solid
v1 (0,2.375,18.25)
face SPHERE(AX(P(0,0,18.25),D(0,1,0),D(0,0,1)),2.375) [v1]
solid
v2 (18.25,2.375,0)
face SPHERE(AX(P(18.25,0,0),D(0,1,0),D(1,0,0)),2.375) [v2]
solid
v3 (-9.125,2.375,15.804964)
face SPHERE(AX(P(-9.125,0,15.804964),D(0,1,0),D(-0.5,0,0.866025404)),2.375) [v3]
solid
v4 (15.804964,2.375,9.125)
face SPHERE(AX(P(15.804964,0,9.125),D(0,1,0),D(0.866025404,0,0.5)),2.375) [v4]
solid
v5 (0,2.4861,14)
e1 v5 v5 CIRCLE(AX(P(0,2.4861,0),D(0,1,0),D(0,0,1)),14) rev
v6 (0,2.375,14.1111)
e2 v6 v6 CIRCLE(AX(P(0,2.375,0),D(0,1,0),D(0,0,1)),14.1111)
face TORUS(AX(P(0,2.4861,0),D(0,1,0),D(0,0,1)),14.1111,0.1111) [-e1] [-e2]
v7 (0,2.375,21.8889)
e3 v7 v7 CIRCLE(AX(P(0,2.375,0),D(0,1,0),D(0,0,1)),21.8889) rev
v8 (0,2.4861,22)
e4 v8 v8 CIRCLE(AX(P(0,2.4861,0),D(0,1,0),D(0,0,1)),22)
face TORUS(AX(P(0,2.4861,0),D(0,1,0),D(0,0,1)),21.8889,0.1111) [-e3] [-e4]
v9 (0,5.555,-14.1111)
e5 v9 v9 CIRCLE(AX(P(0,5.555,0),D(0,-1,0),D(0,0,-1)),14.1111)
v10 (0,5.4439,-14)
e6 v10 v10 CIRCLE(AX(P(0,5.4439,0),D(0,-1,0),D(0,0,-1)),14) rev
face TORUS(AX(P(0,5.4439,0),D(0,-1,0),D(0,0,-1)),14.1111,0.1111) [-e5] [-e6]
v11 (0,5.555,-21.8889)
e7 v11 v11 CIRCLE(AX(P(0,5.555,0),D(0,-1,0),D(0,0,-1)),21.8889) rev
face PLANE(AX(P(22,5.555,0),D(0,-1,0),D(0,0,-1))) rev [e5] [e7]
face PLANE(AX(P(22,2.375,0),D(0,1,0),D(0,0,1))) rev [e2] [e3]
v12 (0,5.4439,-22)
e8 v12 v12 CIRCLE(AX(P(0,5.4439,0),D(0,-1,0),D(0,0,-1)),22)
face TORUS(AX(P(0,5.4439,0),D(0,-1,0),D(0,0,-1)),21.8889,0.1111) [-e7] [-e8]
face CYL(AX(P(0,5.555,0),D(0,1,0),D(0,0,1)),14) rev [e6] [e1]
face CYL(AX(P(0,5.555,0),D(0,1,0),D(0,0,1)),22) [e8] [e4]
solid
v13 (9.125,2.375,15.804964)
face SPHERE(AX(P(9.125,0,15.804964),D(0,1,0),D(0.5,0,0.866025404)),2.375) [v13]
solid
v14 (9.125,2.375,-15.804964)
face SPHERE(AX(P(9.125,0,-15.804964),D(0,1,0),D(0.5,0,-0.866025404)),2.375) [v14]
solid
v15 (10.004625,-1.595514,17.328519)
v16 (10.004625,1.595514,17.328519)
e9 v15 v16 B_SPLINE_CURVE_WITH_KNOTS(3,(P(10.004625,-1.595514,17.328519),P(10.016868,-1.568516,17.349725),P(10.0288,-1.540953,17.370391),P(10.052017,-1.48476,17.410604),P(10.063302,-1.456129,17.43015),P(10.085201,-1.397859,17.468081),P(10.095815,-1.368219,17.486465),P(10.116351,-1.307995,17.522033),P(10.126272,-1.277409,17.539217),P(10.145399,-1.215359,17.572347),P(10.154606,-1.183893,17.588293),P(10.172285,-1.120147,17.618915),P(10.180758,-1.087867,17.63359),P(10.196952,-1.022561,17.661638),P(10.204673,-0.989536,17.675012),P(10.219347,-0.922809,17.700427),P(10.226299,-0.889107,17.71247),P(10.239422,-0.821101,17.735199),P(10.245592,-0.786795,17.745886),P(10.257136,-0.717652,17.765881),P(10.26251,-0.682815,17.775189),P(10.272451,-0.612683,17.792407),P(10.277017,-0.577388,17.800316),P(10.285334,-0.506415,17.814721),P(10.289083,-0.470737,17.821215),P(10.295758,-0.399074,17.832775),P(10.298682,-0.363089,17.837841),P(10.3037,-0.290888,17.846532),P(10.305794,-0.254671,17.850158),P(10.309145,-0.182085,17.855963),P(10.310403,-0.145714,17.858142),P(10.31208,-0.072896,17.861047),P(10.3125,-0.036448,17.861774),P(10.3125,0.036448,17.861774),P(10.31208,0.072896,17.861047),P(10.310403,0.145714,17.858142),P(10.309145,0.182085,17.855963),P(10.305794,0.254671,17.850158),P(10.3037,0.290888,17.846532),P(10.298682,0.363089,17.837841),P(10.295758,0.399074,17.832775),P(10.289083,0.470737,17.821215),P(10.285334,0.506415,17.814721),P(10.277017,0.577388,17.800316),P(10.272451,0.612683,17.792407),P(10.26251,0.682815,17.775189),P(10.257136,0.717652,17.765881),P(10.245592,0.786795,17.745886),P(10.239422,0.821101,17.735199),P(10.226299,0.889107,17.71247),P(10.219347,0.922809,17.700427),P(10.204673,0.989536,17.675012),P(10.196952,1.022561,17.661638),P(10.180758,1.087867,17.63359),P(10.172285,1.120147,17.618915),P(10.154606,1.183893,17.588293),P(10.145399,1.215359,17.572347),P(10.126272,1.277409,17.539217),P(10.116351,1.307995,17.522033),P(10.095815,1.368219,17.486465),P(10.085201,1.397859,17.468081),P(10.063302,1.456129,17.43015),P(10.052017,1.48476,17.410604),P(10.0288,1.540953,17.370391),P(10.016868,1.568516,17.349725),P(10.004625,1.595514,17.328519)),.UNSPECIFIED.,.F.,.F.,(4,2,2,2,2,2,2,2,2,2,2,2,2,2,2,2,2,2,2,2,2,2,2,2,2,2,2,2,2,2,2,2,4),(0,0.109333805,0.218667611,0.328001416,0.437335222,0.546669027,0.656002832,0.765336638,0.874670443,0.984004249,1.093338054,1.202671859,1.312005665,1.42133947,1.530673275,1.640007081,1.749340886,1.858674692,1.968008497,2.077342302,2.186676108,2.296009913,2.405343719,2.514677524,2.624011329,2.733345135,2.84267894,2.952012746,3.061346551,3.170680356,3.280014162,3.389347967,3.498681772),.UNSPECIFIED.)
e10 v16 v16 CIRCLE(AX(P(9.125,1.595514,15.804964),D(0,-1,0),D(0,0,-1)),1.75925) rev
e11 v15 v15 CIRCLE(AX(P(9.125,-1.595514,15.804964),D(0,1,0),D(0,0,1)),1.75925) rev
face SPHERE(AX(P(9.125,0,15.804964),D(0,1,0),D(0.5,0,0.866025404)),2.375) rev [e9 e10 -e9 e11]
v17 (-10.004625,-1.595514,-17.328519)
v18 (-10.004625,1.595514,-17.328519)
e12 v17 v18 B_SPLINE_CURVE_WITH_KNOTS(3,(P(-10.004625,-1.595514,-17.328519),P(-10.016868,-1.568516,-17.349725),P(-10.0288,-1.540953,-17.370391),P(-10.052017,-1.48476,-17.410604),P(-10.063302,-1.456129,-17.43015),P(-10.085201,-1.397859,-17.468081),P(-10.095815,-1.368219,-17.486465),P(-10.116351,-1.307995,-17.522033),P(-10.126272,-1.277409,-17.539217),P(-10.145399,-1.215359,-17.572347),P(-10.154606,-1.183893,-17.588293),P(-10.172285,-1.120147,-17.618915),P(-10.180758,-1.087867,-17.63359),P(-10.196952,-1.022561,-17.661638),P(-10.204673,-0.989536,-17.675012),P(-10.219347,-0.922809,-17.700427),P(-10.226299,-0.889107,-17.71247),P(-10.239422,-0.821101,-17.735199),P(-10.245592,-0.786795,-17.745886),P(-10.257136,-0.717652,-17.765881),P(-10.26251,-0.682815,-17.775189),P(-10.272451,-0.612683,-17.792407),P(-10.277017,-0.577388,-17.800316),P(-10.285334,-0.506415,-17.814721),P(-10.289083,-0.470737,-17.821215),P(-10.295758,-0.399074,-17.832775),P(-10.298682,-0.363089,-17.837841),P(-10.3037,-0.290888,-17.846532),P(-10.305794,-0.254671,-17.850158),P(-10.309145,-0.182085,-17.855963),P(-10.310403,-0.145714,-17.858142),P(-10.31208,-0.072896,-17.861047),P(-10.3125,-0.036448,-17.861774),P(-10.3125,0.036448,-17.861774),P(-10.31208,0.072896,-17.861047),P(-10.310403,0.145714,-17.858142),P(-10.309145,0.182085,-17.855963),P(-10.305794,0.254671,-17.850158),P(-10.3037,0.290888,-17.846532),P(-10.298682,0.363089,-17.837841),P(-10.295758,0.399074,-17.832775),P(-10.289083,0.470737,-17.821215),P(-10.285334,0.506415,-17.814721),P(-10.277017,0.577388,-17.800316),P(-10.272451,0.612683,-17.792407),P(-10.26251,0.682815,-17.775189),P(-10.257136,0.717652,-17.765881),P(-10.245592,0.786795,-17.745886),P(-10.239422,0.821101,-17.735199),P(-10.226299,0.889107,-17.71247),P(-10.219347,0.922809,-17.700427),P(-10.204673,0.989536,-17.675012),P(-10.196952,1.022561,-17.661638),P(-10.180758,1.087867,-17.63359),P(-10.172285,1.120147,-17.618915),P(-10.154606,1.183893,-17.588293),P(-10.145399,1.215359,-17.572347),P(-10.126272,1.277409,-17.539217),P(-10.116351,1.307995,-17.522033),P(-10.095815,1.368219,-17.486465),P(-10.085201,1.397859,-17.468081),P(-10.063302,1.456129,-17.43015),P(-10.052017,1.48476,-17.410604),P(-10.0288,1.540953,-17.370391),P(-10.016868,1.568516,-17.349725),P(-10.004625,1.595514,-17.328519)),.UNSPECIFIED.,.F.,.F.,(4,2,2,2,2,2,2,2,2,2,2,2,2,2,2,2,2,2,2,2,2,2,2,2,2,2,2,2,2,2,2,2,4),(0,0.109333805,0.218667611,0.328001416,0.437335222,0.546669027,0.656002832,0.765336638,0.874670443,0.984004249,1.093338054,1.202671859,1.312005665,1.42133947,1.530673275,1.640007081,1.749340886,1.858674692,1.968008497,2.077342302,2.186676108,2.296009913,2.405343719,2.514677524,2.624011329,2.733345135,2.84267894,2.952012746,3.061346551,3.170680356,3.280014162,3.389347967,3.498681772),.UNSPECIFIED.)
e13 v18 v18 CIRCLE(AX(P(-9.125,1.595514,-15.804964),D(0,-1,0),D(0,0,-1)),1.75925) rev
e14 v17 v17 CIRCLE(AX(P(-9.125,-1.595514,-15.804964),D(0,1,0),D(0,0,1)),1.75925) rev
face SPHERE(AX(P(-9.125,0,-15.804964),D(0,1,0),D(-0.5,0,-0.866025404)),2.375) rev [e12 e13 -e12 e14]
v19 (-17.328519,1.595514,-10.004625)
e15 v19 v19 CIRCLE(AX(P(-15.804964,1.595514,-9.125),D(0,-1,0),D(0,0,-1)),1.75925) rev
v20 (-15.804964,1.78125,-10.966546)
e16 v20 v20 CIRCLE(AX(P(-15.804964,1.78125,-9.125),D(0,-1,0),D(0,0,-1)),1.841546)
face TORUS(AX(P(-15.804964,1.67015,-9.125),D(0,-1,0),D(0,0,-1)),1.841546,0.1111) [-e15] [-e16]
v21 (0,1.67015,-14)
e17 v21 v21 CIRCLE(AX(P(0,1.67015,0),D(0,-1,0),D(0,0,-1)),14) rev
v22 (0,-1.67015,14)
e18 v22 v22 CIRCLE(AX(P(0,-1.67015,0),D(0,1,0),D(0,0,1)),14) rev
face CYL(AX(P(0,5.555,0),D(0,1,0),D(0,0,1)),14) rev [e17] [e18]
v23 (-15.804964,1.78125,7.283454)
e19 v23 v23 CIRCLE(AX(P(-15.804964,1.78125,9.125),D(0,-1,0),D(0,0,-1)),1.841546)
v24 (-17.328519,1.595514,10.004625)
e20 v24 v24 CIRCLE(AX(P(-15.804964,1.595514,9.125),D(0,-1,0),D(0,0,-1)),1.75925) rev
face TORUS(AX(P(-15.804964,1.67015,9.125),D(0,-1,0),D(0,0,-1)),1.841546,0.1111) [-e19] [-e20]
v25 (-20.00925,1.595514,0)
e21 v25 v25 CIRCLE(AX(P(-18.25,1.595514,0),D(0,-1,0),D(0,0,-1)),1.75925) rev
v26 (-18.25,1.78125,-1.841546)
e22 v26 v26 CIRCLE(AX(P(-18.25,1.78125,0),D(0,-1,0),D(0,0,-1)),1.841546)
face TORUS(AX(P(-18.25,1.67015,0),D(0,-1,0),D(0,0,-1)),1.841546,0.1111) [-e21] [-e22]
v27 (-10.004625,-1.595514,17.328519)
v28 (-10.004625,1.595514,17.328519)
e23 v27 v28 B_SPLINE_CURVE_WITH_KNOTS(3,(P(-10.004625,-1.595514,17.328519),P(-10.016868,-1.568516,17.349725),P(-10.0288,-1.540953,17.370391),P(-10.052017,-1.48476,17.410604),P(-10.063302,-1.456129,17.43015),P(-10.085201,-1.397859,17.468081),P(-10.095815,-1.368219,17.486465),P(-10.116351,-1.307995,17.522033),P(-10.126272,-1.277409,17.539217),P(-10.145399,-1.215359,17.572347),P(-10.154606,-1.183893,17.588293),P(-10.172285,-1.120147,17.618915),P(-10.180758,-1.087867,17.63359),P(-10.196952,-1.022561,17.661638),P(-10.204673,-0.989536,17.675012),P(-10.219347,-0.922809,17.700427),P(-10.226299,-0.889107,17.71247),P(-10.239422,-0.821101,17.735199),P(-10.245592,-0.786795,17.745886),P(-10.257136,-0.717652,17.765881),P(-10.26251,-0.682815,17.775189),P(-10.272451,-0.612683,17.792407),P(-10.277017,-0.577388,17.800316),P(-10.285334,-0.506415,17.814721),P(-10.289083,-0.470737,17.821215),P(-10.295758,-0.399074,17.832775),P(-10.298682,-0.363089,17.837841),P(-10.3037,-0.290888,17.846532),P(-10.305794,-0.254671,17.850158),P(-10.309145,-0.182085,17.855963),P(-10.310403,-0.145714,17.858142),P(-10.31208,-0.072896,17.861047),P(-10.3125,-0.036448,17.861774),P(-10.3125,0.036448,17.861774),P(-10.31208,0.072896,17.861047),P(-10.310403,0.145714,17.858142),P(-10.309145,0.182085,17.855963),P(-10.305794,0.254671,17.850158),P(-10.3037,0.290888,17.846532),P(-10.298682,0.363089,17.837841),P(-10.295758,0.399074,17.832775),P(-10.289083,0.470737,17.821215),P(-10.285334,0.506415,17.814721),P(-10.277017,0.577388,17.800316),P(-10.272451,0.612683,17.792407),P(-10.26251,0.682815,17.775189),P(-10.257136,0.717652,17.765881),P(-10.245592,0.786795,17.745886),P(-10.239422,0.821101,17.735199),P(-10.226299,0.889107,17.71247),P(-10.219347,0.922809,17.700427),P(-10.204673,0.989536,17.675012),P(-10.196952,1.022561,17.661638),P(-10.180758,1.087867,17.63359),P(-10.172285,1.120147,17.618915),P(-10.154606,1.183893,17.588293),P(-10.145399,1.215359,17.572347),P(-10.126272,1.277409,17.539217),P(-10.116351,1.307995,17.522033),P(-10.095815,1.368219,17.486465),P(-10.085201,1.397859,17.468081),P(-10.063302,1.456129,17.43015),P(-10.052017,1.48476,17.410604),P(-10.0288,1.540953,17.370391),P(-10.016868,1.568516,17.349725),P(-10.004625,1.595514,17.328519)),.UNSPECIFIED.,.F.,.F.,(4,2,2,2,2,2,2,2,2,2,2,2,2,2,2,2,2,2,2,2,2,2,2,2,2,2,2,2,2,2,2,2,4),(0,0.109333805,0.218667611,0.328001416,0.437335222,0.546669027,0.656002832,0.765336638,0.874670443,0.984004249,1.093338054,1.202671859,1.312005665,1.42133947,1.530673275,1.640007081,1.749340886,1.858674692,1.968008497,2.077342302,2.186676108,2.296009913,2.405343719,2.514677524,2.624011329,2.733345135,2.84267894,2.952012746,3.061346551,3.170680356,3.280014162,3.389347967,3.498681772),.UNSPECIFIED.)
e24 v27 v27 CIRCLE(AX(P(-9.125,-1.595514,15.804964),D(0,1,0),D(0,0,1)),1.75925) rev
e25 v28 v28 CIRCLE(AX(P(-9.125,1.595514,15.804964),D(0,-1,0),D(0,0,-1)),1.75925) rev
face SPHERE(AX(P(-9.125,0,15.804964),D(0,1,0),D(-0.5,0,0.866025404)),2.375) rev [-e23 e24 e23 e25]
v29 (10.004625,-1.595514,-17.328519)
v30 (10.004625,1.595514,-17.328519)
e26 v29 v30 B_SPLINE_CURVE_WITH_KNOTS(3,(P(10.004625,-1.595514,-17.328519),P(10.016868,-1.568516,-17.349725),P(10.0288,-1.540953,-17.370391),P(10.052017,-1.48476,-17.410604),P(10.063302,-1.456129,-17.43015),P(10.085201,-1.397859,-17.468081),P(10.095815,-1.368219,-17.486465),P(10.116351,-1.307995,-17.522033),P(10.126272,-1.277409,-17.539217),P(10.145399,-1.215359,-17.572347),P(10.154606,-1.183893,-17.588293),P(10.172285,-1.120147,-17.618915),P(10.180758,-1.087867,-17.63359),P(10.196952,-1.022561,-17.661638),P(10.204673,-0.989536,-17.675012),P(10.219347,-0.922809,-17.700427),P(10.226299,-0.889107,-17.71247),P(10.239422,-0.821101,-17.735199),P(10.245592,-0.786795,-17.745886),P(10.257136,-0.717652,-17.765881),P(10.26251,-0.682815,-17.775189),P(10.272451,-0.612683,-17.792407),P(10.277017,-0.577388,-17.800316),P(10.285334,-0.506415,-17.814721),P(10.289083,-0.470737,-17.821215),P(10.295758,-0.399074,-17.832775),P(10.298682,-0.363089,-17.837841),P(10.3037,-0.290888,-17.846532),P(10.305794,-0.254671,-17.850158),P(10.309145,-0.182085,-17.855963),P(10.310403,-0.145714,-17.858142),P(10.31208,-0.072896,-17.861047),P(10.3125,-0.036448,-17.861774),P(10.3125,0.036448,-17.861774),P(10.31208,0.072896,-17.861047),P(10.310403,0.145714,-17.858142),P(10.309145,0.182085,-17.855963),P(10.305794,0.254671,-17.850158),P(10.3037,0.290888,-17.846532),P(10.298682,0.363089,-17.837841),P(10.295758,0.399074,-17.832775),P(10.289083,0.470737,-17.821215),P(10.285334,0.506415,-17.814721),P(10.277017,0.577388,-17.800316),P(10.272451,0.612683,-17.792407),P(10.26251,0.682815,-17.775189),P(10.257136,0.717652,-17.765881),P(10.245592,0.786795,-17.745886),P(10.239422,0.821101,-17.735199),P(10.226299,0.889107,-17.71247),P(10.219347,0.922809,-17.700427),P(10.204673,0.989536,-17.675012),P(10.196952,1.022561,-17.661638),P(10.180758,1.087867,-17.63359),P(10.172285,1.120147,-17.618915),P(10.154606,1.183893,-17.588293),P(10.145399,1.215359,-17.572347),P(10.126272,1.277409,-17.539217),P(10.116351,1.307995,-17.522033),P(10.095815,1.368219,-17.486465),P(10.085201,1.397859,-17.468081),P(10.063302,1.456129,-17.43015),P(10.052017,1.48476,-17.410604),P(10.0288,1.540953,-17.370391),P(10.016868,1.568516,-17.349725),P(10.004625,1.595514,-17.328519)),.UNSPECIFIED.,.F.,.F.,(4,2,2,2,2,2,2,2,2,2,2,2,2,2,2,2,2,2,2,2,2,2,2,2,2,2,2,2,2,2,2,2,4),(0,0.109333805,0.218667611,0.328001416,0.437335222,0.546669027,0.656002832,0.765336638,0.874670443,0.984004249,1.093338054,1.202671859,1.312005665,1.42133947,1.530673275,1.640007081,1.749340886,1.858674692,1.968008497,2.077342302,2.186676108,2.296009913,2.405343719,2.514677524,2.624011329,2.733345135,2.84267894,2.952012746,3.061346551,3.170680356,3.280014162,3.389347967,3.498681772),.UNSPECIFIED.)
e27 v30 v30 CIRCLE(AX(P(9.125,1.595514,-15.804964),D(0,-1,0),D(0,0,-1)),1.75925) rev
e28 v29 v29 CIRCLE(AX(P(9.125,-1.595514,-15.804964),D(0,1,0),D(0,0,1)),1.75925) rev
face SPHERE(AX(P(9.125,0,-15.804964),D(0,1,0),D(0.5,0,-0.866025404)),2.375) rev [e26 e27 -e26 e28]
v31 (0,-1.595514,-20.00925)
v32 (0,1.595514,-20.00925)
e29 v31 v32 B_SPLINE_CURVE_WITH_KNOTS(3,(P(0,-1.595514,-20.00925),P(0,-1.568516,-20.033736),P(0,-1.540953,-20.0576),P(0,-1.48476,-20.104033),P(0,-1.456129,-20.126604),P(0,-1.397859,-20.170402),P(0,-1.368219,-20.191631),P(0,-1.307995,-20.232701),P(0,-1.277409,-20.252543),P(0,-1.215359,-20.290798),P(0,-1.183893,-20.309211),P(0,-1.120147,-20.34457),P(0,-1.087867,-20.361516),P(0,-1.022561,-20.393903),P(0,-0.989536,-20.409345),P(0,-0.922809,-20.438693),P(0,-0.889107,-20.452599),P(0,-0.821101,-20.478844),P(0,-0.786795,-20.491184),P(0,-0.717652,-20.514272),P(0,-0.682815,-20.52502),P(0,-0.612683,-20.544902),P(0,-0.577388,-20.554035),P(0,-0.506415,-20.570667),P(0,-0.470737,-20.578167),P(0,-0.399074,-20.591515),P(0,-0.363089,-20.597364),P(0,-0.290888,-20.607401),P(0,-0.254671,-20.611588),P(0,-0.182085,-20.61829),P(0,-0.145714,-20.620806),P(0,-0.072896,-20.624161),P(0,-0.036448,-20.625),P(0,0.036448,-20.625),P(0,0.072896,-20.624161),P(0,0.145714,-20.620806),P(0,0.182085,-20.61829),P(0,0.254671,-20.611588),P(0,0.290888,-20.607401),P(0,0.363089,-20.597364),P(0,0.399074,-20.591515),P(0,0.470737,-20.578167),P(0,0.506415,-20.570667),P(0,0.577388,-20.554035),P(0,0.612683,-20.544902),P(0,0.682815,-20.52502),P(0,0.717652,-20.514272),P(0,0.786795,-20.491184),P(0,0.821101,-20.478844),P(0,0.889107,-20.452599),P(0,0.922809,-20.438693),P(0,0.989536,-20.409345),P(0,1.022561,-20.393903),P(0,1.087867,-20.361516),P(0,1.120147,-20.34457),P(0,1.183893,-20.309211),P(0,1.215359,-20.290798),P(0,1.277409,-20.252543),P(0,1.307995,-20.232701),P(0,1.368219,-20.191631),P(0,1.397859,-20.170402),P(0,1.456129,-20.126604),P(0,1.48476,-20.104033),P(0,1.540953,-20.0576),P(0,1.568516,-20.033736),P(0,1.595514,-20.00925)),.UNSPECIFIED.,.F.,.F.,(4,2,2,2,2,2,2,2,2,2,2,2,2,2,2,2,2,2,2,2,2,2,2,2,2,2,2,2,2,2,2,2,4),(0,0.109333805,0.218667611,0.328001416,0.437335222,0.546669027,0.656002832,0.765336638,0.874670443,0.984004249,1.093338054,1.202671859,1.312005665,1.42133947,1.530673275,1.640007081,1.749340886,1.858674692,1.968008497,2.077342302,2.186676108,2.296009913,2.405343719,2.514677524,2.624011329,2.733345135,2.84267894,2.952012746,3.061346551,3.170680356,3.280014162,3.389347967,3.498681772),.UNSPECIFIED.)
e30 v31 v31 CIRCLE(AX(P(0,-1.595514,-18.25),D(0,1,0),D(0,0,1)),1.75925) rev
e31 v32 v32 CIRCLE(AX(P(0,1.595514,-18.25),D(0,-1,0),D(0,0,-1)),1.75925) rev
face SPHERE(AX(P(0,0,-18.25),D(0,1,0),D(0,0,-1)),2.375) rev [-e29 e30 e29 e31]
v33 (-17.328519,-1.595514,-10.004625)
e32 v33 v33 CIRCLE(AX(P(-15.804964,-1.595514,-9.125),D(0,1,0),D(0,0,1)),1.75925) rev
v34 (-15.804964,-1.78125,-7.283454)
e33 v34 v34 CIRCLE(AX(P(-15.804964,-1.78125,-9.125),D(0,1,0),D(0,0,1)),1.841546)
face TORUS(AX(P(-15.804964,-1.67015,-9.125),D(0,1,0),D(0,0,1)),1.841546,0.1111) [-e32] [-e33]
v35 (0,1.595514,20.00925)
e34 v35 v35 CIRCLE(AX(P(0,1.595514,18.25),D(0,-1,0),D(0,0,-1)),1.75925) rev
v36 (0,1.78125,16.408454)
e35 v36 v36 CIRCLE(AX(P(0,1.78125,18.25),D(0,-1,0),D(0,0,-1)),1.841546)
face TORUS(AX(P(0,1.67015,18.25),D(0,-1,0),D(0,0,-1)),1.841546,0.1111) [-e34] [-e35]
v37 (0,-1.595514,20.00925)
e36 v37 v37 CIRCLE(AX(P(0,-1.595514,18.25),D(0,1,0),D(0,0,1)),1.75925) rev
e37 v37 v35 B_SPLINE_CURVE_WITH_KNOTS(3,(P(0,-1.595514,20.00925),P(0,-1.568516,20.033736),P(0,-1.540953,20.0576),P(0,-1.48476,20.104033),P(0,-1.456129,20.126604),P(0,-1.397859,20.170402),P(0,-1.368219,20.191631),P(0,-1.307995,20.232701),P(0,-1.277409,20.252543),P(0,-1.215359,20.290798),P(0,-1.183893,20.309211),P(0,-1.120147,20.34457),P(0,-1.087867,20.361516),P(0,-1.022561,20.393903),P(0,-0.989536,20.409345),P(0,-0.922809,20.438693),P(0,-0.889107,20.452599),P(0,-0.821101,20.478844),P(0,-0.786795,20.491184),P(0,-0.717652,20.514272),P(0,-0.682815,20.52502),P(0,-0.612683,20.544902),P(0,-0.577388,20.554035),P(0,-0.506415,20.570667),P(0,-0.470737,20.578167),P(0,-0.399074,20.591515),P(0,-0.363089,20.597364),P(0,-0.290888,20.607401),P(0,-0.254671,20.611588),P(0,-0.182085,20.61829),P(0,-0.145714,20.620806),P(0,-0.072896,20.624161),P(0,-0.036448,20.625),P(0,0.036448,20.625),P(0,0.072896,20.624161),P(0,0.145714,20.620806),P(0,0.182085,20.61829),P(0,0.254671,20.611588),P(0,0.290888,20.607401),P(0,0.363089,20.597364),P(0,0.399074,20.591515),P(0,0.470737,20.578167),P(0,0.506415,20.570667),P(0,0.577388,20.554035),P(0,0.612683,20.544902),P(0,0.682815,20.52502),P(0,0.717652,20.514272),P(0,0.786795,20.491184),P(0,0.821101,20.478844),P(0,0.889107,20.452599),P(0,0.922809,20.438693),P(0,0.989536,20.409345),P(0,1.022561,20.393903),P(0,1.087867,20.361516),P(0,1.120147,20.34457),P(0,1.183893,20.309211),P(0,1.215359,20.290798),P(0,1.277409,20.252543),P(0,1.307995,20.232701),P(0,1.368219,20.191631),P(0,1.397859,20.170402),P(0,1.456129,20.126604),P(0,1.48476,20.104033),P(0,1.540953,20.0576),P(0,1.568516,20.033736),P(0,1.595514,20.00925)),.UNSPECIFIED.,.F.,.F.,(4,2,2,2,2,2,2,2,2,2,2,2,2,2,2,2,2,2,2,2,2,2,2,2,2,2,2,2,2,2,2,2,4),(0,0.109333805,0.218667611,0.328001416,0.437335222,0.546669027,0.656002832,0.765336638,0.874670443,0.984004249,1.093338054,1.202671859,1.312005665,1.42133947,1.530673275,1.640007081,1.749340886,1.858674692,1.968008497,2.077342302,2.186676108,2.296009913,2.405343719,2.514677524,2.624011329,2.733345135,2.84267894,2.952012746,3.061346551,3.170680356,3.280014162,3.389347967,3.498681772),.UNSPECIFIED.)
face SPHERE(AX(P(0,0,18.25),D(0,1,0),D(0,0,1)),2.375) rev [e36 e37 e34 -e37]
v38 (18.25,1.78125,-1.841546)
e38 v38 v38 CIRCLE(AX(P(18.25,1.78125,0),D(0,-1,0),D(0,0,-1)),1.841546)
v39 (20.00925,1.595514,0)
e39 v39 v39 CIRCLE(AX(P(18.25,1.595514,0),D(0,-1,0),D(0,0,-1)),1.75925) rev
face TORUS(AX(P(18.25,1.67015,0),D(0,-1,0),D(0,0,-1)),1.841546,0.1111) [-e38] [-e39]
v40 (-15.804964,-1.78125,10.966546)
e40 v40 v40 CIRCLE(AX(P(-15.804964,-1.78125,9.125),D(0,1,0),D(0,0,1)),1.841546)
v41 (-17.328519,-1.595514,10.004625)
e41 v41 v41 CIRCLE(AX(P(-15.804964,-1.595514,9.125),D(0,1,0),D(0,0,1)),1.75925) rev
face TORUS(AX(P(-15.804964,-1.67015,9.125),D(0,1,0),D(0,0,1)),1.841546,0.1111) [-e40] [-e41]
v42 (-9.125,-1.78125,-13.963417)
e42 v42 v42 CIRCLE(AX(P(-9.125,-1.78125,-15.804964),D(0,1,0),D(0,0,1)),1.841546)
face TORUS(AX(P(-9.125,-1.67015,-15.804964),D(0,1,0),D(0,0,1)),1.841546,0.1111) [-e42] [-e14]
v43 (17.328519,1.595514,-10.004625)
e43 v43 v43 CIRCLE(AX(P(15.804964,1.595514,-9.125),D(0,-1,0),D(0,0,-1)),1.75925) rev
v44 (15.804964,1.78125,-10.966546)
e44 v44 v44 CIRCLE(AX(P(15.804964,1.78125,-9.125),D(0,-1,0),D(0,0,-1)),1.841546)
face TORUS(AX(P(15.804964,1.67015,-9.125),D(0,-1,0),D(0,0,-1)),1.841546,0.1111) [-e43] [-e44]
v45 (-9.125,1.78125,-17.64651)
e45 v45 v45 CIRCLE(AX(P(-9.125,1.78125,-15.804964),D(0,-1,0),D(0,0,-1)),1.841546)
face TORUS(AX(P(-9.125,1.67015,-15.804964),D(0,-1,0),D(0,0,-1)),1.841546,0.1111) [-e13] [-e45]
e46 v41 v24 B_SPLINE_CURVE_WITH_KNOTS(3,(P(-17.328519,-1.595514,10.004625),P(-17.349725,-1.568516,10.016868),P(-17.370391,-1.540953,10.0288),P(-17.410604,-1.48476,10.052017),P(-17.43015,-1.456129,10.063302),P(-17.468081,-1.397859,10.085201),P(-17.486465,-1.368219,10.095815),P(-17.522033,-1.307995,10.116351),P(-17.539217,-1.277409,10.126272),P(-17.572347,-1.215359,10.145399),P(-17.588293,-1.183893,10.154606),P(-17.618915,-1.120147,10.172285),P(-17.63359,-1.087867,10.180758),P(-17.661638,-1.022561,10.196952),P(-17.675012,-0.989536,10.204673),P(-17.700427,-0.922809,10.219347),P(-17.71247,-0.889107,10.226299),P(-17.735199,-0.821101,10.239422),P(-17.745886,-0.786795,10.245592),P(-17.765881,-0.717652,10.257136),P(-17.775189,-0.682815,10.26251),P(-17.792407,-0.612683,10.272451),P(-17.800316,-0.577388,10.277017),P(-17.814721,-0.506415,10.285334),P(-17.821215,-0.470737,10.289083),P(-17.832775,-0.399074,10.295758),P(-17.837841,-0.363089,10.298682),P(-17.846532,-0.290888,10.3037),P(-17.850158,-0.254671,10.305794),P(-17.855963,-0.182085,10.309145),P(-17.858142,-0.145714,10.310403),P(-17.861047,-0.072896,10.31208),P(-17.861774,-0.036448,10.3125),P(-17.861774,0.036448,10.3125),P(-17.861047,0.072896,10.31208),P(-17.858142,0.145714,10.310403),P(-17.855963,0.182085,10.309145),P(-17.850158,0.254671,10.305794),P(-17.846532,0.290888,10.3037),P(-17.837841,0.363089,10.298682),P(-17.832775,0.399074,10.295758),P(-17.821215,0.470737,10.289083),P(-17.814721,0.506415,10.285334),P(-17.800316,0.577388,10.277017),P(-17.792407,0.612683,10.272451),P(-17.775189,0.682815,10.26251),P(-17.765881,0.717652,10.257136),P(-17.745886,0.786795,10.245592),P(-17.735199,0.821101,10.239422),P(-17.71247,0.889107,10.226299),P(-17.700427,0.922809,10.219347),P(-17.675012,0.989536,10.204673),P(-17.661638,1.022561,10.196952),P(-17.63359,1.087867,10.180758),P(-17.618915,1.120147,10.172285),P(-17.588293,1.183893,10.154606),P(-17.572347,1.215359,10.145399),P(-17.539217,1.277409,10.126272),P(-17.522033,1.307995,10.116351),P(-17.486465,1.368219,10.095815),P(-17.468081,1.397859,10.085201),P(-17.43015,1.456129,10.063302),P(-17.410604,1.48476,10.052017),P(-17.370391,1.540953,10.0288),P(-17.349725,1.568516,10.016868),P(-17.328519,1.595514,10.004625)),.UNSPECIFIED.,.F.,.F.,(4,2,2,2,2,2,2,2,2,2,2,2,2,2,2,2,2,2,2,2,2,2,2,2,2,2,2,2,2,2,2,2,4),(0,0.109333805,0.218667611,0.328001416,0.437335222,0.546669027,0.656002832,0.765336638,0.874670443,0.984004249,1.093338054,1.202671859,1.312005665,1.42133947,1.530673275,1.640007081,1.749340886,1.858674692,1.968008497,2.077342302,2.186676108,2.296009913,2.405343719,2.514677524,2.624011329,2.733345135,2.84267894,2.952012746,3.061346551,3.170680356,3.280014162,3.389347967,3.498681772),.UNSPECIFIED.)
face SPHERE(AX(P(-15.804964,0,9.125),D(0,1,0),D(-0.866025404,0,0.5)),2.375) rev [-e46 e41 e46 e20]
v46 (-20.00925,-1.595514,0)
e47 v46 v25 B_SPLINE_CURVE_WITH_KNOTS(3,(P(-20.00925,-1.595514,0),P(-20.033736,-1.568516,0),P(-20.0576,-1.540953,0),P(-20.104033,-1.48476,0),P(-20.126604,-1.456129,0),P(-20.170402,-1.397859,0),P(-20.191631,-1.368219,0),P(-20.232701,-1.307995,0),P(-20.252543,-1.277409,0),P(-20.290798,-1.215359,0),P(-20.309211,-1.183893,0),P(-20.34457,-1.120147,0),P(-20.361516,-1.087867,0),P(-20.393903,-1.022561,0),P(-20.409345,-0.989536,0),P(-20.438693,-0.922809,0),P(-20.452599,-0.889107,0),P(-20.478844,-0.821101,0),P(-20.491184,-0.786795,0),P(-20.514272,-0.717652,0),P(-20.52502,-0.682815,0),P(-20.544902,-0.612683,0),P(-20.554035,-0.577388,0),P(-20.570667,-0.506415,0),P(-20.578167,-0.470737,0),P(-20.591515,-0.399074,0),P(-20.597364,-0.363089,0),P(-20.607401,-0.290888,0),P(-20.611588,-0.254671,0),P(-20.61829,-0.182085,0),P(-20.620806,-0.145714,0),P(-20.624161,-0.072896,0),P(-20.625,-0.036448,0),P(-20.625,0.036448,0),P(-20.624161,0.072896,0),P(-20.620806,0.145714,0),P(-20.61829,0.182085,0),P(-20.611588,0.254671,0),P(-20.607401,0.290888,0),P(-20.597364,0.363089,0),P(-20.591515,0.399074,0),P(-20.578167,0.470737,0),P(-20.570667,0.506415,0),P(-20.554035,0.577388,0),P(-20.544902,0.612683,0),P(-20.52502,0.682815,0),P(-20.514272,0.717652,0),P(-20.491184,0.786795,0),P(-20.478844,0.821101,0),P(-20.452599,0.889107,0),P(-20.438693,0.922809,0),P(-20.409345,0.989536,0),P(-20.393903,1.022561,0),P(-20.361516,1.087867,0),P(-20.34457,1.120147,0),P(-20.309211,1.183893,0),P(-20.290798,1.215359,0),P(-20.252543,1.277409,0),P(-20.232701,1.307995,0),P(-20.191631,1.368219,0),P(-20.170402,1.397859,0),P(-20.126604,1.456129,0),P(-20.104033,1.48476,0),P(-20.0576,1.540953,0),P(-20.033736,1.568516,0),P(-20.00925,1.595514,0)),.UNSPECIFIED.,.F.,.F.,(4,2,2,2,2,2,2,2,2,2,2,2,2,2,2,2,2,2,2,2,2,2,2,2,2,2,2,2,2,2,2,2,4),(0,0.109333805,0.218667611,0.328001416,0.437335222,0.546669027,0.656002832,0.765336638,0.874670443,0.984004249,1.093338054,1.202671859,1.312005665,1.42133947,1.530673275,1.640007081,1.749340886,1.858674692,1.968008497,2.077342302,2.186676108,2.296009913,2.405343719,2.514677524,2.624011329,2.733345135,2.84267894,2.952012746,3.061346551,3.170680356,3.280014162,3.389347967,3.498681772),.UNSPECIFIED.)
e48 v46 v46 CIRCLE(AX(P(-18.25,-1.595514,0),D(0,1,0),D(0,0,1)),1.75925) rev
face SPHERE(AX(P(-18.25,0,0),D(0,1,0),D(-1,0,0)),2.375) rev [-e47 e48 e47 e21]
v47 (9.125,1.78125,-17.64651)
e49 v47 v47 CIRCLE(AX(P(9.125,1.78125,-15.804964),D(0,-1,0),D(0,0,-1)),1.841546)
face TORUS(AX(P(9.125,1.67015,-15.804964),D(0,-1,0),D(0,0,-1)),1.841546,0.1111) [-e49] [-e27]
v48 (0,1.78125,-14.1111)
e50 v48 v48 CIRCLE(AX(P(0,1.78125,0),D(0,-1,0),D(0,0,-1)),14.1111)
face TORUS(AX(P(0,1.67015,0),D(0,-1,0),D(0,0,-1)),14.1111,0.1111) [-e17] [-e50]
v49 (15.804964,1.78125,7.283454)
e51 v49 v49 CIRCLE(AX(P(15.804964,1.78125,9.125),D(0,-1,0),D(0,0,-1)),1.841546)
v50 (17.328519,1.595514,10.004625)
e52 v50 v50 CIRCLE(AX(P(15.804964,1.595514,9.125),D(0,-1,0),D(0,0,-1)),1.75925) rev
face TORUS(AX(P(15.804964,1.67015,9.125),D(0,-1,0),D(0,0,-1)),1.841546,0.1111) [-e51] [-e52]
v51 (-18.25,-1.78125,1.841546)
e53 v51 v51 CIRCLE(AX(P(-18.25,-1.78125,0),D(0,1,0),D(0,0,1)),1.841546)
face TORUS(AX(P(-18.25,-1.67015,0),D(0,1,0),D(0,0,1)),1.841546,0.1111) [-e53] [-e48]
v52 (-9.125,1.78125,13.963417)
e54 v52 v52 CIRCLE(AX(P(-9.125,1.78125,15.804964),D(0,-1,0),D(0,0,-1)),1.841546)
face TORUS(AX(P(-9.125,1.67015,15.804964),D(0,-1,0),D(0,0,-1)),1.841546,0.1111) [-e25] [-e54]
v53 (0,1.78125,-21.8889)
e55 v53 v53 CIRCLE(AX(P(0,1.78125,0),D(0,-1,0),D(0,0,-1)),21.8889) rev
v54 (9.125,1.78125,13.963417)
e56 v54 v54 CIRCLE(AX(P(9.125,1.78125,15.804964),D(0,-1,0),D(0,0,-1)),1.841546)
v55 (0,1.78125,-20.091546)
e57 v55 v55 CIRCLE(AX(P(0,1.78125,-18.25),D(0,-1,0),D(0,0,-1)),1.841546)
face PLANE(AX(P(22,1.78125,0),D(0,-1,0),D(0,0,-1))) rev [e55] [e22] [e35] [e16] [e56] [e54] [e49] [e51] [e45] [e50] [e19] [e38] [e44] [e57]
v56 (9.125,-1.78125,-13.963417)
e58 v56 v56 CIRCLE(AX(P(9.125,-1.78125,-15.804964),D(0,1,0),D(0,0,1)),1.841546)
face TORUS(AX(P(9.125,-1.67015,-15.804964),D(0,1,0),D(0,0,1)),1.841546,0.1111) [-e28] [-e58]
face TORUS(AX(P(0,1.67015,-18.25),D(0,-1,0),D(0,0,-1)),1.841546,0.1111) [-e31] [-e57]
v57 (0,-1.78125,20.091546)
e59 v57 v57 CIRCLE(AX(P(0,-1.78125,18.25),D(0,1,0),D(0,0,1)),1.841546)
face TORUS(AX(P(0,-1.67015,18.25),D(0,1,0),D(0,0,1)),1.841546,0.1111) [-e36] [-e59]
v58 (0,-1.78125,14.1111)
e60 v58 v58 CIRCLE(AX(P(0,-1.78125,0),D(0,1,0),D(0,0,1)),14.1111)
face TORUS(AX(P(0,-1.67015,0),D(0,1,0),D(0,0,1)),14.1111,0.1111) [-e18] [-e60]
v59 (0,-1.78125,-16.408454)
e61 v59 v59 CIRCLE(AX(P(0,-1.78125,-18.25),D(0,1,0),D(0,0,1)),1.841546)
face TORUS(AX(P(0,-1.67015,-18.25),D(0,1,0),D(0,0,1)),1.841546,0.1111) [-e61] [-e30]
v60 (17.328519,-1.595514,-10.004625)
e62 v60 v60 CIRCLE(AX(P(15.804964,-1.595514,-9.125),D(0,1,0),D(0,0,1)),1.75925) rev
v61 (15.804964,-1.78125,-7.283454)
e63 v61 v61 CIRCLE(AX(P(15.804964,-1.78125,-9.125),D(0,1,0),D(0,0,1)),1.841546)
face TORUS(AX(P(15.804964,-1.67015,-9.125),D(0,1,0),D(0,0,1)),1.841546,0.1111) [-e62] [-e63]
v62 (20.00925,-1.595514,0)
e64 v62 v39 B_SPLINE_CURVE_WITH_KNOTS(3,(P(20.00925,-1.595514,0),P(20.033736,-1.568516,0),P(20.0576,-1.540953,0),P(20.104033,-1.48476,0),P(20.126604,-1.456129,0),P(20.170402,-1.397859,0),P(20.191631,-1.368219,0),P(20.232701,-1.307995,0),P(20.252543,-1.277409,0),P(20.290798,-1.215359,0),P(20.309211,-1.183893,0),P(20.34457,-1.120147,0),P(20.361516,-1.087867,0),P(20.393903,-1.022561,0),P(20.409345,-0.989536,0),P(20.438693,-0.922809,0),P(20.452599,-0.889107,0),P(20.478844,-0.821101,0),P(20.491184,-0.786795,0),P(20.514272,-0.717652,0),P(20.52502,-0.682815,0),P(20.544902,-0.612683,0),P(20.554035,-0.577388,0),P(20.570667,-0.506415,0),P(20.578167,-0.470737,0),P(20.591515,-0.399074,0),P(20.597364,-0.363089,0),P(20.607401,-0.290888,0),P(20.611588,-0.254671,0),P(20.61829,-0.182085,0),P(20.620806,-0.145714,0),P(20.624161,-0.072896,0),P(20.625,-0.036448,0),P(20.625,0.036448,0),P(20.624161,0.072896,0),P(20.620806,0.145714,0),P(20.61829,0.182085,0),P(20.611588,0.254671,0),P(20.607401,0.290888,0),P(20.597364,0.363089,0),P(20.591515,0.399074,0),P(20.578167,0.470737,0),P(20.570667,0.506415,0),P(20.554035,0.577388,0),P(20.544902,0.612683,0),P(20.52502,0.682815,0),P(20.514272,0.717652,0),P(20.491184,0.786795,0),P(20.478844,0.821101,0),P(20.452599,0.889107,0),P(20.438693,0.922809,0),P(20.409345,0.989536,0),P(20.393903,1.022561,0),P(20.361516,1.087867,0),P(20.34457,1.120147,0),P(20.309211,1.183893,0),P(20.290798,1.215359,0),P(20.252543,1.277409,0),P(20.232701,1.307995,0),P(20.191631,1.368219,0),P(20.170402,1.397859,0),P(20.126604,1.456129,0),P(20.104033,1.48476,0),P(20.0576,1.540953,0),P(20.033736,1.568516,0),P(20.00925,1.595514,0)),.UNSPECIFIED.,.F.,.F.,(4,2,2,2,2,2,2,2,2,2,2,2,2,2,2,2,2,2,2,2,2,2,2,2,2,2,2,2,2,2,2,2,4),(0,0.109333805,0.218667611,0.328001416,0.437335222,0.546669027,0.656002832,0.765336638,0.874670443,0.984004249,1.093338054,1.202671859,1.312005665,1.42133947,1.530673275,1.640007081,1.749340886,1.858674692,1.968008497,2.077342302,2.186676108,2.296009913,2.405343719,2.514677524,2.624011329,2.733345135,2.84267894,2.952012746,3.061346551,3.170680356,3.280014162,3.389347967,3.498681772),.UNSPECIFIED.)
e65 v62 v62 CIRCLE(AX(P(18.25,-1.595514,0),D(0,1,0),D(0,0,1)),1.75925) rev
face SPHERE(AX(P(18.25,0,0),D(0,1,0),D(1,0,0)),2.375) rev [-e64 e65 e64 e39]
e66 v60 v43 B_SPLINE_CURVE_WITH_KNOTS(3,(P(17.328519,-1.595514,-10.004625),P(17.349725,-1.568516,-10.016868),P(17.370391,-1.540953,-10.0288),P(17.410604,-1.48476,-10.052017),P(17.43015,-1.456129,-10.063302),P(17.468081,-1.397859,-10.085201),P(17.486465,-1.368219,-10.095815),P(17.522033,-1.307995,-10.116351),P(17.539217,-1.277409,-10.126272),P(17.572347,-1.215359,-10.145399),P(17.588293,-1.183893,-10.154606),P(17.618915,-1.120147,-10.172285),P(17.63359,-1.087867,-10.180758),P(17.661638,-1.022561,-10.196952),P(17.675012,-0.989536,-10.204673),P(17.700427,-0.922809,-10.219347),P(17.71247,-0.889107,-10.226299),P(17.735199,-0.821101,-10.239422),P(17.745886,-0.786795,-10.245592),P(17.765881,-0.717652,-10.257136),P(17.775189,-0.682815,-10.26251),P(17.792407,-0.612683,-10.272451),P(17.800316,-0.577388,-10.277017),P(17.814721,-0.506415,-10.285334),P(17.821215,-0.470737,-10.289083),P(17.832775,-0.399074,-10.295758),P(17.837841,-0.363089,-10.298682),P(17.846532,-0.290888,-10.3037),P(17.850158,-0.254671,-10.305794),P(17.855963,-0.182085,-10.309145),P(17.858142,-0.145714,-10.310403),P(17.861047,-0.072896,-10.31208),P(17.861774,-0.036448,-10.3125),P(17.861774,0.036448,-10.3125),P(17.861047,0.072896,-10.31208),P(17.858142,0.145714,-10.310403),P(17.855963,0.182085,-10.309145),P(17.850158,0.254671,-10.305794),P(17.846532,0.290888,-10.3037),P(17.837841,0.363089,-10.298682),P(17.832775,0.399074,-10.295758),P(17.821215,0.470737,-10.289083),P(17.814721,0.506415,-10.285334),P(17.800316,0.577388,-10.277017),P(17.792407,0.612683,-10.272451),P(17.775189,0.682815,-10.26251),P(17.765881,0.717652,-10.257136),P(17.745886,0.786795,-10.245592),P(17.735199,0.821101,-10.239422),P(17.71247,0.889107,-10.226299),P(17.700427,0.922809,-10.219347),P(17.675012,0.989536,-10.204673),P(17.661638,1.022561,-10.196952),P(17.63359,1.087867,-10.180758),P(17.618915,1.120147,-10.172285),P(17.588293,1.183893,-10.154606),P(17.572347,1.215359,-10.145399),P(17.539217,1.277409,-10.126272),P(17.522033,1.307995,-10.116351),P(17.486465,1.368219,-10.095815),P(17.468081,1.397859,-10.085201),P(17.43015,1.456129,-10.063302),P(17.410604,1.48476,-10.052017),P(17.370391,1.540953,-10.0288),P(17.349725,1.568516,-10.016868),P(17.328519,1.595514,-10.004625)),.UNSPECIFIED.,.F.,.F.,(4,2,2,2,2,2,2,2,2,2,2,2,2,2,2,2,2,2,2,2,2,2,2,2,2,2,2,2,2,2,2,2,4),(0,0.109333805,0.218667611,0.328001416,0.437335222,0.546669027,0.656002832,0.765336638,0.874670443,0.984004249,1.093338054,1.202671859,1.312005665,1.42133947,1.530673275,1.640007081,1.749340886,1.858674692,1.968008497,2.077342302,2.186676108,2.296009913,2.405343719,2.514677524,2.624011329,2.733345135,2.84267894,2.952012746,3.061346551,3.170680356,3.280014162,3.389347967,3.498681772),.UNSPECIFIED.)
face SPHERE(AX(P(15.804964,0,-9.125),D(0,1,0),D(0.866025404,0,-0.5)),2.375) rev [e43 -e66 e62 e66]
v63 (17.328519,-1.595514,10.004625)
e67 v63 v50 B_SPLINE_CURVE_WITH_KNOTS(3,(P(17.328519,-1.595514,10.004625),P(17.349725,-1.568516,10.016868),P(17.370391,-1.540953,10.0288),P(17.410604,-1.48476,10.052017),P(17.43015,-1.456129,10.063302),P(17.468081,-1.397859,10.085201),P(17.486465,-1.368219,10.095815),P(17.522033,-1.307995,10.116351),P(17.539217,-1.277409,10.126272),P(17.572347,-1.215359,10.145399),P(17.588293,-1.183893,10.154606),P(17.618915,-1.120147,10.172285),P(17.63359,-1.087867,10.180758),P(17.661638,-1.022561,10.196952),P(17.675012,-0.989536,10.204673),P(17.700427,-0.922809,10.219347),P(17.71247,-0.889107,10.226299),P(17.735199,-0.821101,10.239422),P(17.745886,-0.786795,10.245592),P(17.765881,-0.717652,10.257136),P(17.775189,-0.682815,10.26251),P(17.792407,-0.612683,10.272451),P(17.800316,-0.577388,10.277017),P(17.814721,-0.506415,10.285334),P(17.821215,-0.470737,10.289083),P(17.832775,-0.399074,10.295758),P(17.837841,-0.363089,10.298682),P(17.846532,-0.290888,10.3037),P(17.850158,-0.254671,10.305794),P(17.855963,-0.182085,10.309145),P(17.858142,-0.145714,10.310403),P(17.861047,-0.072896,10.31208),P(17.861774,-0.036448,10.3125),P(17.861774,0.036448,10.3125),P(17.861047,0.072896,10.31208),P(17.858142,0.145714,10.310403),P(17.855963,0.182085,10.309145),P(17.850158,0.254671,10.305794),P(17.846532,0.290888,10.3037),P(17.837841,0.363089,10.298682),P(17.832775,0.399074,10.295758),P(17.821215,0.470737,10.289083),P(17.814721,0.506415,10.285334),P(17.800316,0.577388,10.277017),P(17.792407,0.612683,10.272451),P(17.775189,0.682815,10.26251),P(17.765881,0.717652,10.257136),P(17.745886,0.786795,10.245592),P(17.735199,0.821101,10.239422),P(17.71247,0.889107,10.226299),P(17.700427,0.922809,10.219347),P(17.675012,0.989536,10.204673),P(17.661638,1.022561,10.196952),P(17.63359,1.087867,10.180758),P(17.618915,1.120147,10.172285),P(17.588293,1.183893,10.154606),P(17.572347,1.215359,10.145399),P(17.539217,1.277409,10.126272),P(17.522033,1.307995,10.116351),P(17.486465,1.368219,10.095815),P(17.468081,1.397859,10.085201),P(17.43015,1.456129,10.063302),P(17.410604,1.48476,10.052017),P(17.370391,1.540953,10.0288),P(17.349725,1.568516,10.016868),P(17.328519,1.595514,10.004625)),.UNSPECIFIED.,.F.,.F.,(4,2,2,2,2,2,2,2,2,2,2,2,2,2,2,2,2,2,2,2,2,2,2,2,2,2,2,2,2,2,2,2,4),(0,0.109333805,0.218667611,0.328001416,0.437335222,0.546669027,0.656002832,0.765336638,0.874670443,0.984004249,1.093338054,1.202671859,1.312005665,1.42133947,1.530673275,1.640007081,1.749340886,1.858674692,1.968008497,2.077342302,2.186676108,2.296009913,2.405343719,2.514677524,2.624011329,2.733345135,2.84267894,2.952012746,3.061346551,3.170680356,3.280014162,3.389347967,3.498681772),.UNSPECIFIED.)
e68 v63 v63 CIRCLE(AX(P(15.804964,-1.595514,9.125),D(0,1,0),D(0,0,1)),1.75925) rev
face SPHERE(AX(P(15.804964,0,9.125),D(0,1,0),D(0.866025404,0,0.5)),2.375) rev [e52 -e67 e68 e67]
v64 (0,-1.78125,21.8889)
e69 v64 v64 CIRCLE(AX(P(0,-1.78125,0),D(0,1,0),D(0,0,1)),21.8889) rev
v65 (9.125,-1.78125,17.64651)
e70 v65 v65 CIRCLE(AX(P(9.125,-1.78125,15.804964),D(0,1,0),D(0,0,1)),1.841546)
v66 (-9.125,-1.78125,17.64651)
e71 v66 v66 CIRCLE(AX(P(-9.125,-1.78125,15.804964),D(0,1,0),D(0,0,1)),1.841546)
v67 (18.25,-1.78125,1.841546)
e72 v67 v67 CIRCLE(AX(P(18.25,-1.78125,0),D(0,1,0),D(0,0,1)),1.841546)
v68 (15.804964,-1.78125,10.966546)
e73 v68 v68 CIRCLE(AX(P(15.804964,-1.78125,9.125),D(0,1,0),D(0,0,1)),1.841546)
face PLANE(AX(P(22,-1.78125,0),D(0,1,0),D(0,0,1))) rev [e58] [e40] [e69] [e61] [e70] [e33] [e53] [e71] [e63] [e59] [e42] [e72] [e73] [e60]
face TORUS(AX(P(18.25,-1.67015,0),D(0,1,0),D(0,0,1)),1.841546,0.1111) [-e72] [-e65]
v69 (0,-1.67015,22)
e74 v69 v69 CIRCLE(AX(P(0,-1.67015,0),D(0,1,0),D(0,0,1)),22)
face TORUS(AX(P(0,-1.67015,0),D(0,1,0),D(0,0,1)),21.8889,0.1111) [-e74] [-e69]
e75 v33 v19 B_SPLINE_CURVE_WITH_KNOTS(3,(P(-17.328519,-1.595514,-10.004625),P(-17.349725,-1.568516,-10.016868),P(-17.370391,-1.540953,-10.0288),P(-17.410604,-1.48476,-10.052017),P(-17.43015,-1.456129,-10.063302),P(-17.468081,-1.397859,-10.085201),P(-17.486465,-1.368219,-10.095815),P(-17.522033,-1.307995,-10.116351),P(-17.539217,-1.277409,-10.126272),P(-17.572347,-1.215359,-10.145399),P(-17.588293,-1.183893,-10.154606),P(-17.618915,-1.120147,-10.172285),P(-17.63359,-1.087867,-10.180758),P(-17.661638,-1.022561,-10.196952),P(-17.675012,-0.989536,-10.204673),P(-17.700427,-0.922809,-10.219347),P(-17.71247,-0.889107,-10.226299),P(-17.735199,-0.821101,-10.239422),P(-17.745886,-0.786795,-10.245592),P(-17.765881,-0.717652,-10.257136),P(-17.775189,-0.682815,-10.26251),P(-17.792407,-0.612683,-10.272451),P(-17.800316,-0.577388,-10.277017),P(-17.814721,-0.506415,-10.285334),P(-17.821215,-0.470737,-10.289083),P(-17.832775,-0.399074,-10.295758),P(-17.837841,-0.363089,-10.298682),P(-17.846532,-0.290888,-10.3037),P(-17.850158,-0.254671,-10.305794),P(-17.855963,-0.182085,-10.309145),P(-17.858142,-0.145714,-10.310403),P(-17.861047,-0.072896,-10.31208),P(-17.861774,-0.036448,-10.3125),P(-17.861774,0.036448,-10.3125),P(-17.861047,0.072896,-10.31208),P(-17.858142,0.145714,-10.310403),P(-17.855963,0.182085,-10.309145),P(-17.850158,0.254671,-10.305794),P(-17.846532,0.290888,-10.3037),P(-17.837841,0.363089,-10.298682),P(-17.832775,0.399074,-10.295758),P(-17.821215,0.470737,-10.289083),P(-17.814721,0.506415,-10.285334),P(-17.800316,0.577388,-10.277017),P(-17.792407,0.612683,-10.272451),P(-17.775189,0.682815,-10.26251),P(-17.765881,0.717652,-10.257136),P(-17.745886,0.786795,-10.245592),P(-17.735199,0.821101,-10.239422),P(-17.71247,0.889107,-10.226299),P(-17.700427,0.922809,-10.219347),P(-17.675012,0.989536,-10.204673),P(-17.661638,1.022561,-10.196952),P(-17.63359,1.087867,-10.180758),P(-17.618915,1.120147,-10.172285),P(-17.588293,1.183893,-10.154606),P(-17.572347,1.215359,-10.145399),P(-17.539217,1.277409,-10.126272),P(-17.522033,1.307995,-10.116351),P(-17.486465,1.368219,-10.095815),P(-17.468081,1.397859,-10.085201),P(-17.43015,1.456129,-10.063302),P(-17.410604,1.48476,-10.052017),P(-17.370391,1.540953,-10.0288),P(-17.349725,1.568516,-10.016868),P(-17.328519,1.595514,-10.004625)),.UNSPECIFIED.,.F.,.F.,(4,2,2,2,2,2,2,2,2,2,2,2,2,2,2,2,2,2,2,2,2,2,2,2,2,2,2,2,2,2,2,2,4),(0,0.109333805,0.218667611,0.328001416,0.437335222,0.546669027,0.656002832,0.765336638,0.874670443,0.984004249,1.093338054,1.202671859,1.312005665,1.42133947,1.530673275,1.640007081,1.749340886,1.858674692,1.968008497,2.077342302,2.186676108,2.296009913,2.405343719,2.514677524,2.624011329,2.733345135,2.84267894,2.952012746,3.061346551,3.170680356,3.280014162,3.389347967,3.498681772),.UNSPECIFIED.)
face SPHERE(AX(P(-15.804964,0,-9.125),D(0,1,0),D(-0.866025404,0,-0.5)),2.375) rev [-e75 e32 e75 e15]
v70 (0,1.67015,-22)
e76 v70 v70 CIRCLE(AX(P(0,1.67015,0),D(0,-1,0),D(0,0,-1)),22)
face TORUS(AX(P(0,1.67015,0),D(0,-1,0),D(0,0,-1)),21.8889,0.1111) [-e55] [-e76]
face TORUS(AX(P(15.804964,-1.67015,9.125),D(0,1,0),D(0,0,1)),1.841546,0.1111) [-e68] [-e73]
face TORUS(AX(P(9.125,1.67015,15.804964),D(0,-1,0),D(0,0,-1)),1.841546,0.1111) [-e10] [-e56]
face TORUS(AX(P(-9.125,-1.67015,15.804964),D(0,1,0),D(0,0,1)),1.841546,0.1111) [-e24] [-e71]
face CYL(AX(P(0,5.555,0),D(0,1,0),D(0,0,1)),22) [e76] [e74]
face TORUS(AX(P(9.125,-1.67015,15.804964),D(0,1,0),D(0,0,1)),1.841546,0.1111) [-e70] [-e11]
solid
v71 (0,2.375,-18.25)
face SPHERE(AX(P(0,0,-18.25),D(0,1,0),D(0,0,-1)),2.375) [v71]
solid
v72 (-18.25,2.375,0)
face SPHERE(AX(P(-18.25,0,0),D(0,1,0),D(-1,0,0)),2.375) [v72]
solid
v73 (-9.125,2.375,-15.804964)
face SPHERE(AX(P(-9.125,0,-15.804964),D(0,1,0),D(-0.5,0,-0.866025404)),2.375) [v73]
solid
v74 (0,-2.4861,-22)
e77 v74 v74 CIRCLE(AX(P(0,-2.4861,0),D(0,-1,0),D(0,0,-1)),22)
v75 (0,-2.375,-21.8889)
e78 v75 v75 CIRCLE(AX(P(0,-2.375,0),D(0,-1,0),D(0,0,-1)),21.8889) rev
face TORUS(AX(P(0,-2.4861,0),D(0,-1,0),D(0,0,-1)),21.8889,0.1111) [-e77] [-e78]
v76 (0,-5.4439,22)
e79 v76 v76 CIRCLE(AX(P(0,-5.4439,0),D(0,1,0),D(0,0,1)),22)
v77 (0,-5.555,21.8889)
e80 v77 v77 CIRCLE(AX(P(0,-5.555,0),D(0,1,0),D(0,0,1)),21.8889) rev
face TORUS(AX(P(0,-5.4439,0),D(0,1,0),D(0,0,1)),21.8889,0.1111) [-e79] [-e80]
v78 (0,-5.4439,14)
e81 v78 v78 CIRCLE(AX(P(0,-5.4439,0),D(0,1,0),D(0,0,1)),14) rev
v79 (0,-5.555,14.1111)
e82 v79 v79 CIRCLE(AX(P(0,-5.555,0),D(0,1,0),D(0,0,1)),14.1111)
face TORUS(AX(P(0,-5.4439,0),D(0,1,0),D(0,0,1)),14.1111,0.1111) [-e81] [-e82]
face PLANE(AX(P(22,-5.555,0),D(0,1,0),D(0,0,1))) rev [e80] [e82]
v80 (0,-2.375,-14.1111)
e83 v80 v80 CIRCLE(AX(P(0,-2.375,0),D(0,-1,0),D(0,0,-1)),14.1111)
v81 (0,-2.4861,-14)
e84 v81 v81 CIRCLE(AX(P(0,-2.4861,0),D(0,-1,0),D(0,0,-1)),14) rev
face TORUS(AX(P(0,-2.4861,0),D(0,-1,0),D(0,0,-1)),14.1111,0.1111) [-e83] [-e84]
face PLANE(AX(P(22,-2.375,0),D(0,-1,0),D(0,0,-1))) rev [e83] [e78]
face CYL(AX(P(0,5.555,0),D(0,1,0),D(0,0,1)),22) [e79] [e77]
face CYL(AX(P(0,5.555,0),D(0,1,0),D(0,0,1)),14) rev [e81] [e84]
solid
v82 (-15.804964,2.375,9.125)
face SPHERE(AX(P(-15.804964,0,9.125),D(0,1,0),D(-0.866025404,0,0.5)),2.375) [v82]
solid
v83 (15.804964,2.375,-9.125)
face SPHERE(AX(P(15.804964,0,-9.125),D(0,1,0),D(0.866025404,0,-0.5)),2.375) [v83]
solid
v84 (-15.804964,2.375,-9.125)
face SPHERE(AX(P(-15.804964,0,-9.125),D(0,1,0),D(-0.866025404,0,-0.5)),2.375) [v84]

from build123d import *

# Parameters (mm, degrees)
SKETCH3_W         = 8
SKETCH3_H         = 3.5625
CIRPATTERN1_COUNT = 12
CIRPATTERN1_ANGLE = 330
CIRPATTERN2_COUNT = 12
SKETCH6_W         = 8
SKETCH6_H         = 3.18
FILLET1_R         = 0.1111
FILLET2_R         = 0.1111
FILLET3_R         = 0.1111


with BuildPart() as part:
    # Sketch3 → Revolve1 (revolve)
    with BuildSketch(Plane.XY):
        with Locations((18, 0)):
            Rectangle(SKETCH3_W, SKETCH3_H)
    revolve(axis=Axis((0, 5.555, 0), (0, -1, 0)))

    # Sketch4 → Cut-Revolve1 (revolve, cut)
    with BuildSketch(Plane.XY):
        with BuildLine():
            Line((18.25, 2.375), (18.25, -2.375))
            ThreePointArc((18.25, -2.375), (15.875, 0), (18.25, 2.375))
        make_face()
    cut_revolve1 = revolve(axis=Axis((18.25, 2.375, 0), (0, -1, 0)), mode=Mode.SUBTRACT)

    # CirPattern2: Cut-Revolve1 ×12 about axis
    cirpattern2_axis = Axis((0, 5.555, 0), (0, -1, 0))
    for i in range(1, CIRPATTERN2_COUNT):
        add(cut_revolve1.rotate(cirpattern2_axis, i * 360 / CIRPATTERN2_COUNT), mode=Mode.SUBTRACT)

    # Fillet2
    fillet2_edges = [part.edges().sort_by_distance(p)[0] for p in [
        (-14, -1.78125, 0),
        (-22, -1.78125, 0),
        (19.820914841, -1.78125, 0),
        (17.165415779, -1.78125, 9.91045742),
        (9.91045742, -1.78125, 17.165415779),
        (0, -1.78125, 19.820914841),
        (-9.91045742, -1.78125, 17.165415779),
        (-17.165415779, -1.78125, 9.91045742),
        (-19.820914841, -1.78125, 0),
        (-22, 1.78125, 0),
        (-14, 1.78125, 0),
        (19.820914841, 1.78125, 0),
        (17.165415779, 1.78125, 9.91045742),
        (9.91045742, 1.78125, 17.165415779),
        (0, 1.78125, 19.820914841),
        (-9.91045742, 1.78125, 17.165415779),
        (-17.165415779, 1.78125, 9.91045742),
        (-19.820914841, 1.78125, 0),
        (-17.165415779, -1.78125, -9.91045742),
        (-17.165415779, 1.78125, -9.91045742),
        (-9.91045742, -1.78125, -17.165415779),
        (0, -1.78125, -19.820914841),
        (9.91045742, -1.78125, -17.165415779),
        (17.165415779, -1.78125, -9.91045742),
        (-9.91045742, 1.78125, -17.165415779),
        (0, 1.78125, -19.820914841),
        (9.91045742, 1.78125, -17.165415779),
        (17.165415779, 1.78125, -9.91045742),
    ]]
    fillet(fillet2_edges, radius=FILLET2_R)


with BuildPart() as body_2:
    # Sketch5 → Revolve2 (revolve)
    with BuildSketch(Plane.XY):
        with BuildLine():
            Line((18.25, 2.375), (18.25, -2.375))
            ThreePointArc((18.25, -2.375), (15.875, 0), (18.25, 2.375))
        make_face()
    revolve(axis=Axis((18.25, 2.375, 0), (0, -1, 0)))


with BuildPart() as cirpattern1_1:
    # CirPattern1: pattern copy
    add(body_2.part.rotate(Axis((0, 5.555, 0), (0, -1, 0)), 1 * CIRPATTERN1_ANGLE / (CIRPATTERN1_COUNT - 1)))


with BuildPart() as cirpattern1_2:
    # CirPattern1: pattern copy
    add(body_2.part.rotate(Axis((0, 5.555, 0), (0, -1, 0)), 2 * CIRPATTERN1_ANGLE / (CIRPATTERN1_COUNT - 1)))


with BuildPart() as cirpattern1_3:
    # CirPattern1: pattern copy
    add(body_2.part.rotate(Axis((0, 5.555, 0), (0, -1, 0)), 3 * CIRPATTERN1_ANGLE / (CIRPATTERN1_COUNT - 1)))


with BuildPart() as cirpattern1_4:
    # CirPattern1: pattern copy
    add(body_2.part.rotate(Axis((0, 5.555, 0), (0, -1, 0)), 4 * CIRPATTERN1_ANGLE / (CIRPATTERN1_COUNT - 1)))


with BuildPart() as cirpattern1_5:
    # CirPattern1: pattern copy
    add(body_2.part.rotate(Axis((0, 5.555, 0), (0, -1, 0)), 5 * CIRPATTERN1_ANGLE / (CIRPATTERN1_COUNT - 1)))


with BuildPart() as cirpattern1_6:
    # CirPattern1: pattern copy
    add(body_2.part.rotate(Axis((0, 5.555, 0), (0, -1, 0)), 6 * CIRPATTERN1_ANGLE / (CIRPATTERN1_COUNT - 1)))


with BuildPart() as cirpattern1_7:
    # CirPattern1: pattern copy
    add(body_2.part.rotate(Axis((0, 5.555, 0), (0, -1, 0)), 7 * CIRPATTERN1_ANGLE / (CIRPATTERN1_COUNT - 1)))


with BuildPart() as cirpattern1_8:
    # CirPattern1: pattern copy
    add(body_2.part.rotate(Axis((0, 5.555, 0), (0, -1, 0)), 8 * CIRPATTERN1_ANGLE / (CIRPATTERN1_COUNT - 1)))


with BuildPart() as cirpattern1_9:
    # CirPattern1: pattern copy
    add(body_2.part.rotate(Axis((0, 5.555, 0), (0, -1, 0)), 9 * CIRPATTERN1_ANGLE / (CIRPATTERN1_COUNT - 1)))


with BuildPart() as cirpattern1_10:
    # CirPattern1: pattern copy
    add(body_2.part.rotate(Axis((0, 5.555, 0), (0, -1, 0)), 10 * CIRPATTERN1_ANGLE / (CIRPATTERN1_COUNT - 1)))


with BuildPart() as cirpattern1_11:
    # CirPattern1: pattern copy
    add(body_2.part.rotate(Axis((0, 5.555, 0), (0, -1, 0)), 11 * CIRPATTERN1_ANGLE / (CIRPATTERN1_COUNT - 1)))


with BuildPart() as body_14:
    # Sketch6 → Revolve3 (revolve)
    with BuildSketch(Plane.XY):
        with Locations((18, 3.965)):
            Rectangle(SKETCH6_W, SKETCH6_H)
        with Locations((18, -3.965)):
            Rectangle(SKETCH6_W, SKETCH6_H)
    revolve(axis=Axis((0, 5.555, 0), (0, -1, 0)))

    # Fillet1
    fillet1_edges = [body_14.edges().sort_by_distance(p)[0] for p in [
        (-14, 2.375, 0),
        (-22, 2.375, 0),
        (-22, 5.555, 0),
        (-14, 5.555, 0),
    ]]
    fillet(fillet1_edges, radius=FILLET1_R)

    # Fillet3
    fillet3_edges = [body_14.edges().sort_by_distance(p)[0] for p in [
        (-22, -2.375, 0),
        (-14, -2.375, 0),
        (-14, -5.555, 0),
        (-22, -5.555, 0),
    ]]
    fillet(fillet3_edges, radius=FILLET3_R)


solid = Compound([part.part, body_2.part, cirpattern1_1.part, cirpattern1_2.part, cirpattern1_3.part, cirpattern1_4.part, cirpattern1_5.part, cirpattern1_6.part, cirpattern1_7.part, cirpattern1_8.part, cirpattern1_9.part, cirpattern1_10.part, cirpattern1_11.part, body_14.part])
